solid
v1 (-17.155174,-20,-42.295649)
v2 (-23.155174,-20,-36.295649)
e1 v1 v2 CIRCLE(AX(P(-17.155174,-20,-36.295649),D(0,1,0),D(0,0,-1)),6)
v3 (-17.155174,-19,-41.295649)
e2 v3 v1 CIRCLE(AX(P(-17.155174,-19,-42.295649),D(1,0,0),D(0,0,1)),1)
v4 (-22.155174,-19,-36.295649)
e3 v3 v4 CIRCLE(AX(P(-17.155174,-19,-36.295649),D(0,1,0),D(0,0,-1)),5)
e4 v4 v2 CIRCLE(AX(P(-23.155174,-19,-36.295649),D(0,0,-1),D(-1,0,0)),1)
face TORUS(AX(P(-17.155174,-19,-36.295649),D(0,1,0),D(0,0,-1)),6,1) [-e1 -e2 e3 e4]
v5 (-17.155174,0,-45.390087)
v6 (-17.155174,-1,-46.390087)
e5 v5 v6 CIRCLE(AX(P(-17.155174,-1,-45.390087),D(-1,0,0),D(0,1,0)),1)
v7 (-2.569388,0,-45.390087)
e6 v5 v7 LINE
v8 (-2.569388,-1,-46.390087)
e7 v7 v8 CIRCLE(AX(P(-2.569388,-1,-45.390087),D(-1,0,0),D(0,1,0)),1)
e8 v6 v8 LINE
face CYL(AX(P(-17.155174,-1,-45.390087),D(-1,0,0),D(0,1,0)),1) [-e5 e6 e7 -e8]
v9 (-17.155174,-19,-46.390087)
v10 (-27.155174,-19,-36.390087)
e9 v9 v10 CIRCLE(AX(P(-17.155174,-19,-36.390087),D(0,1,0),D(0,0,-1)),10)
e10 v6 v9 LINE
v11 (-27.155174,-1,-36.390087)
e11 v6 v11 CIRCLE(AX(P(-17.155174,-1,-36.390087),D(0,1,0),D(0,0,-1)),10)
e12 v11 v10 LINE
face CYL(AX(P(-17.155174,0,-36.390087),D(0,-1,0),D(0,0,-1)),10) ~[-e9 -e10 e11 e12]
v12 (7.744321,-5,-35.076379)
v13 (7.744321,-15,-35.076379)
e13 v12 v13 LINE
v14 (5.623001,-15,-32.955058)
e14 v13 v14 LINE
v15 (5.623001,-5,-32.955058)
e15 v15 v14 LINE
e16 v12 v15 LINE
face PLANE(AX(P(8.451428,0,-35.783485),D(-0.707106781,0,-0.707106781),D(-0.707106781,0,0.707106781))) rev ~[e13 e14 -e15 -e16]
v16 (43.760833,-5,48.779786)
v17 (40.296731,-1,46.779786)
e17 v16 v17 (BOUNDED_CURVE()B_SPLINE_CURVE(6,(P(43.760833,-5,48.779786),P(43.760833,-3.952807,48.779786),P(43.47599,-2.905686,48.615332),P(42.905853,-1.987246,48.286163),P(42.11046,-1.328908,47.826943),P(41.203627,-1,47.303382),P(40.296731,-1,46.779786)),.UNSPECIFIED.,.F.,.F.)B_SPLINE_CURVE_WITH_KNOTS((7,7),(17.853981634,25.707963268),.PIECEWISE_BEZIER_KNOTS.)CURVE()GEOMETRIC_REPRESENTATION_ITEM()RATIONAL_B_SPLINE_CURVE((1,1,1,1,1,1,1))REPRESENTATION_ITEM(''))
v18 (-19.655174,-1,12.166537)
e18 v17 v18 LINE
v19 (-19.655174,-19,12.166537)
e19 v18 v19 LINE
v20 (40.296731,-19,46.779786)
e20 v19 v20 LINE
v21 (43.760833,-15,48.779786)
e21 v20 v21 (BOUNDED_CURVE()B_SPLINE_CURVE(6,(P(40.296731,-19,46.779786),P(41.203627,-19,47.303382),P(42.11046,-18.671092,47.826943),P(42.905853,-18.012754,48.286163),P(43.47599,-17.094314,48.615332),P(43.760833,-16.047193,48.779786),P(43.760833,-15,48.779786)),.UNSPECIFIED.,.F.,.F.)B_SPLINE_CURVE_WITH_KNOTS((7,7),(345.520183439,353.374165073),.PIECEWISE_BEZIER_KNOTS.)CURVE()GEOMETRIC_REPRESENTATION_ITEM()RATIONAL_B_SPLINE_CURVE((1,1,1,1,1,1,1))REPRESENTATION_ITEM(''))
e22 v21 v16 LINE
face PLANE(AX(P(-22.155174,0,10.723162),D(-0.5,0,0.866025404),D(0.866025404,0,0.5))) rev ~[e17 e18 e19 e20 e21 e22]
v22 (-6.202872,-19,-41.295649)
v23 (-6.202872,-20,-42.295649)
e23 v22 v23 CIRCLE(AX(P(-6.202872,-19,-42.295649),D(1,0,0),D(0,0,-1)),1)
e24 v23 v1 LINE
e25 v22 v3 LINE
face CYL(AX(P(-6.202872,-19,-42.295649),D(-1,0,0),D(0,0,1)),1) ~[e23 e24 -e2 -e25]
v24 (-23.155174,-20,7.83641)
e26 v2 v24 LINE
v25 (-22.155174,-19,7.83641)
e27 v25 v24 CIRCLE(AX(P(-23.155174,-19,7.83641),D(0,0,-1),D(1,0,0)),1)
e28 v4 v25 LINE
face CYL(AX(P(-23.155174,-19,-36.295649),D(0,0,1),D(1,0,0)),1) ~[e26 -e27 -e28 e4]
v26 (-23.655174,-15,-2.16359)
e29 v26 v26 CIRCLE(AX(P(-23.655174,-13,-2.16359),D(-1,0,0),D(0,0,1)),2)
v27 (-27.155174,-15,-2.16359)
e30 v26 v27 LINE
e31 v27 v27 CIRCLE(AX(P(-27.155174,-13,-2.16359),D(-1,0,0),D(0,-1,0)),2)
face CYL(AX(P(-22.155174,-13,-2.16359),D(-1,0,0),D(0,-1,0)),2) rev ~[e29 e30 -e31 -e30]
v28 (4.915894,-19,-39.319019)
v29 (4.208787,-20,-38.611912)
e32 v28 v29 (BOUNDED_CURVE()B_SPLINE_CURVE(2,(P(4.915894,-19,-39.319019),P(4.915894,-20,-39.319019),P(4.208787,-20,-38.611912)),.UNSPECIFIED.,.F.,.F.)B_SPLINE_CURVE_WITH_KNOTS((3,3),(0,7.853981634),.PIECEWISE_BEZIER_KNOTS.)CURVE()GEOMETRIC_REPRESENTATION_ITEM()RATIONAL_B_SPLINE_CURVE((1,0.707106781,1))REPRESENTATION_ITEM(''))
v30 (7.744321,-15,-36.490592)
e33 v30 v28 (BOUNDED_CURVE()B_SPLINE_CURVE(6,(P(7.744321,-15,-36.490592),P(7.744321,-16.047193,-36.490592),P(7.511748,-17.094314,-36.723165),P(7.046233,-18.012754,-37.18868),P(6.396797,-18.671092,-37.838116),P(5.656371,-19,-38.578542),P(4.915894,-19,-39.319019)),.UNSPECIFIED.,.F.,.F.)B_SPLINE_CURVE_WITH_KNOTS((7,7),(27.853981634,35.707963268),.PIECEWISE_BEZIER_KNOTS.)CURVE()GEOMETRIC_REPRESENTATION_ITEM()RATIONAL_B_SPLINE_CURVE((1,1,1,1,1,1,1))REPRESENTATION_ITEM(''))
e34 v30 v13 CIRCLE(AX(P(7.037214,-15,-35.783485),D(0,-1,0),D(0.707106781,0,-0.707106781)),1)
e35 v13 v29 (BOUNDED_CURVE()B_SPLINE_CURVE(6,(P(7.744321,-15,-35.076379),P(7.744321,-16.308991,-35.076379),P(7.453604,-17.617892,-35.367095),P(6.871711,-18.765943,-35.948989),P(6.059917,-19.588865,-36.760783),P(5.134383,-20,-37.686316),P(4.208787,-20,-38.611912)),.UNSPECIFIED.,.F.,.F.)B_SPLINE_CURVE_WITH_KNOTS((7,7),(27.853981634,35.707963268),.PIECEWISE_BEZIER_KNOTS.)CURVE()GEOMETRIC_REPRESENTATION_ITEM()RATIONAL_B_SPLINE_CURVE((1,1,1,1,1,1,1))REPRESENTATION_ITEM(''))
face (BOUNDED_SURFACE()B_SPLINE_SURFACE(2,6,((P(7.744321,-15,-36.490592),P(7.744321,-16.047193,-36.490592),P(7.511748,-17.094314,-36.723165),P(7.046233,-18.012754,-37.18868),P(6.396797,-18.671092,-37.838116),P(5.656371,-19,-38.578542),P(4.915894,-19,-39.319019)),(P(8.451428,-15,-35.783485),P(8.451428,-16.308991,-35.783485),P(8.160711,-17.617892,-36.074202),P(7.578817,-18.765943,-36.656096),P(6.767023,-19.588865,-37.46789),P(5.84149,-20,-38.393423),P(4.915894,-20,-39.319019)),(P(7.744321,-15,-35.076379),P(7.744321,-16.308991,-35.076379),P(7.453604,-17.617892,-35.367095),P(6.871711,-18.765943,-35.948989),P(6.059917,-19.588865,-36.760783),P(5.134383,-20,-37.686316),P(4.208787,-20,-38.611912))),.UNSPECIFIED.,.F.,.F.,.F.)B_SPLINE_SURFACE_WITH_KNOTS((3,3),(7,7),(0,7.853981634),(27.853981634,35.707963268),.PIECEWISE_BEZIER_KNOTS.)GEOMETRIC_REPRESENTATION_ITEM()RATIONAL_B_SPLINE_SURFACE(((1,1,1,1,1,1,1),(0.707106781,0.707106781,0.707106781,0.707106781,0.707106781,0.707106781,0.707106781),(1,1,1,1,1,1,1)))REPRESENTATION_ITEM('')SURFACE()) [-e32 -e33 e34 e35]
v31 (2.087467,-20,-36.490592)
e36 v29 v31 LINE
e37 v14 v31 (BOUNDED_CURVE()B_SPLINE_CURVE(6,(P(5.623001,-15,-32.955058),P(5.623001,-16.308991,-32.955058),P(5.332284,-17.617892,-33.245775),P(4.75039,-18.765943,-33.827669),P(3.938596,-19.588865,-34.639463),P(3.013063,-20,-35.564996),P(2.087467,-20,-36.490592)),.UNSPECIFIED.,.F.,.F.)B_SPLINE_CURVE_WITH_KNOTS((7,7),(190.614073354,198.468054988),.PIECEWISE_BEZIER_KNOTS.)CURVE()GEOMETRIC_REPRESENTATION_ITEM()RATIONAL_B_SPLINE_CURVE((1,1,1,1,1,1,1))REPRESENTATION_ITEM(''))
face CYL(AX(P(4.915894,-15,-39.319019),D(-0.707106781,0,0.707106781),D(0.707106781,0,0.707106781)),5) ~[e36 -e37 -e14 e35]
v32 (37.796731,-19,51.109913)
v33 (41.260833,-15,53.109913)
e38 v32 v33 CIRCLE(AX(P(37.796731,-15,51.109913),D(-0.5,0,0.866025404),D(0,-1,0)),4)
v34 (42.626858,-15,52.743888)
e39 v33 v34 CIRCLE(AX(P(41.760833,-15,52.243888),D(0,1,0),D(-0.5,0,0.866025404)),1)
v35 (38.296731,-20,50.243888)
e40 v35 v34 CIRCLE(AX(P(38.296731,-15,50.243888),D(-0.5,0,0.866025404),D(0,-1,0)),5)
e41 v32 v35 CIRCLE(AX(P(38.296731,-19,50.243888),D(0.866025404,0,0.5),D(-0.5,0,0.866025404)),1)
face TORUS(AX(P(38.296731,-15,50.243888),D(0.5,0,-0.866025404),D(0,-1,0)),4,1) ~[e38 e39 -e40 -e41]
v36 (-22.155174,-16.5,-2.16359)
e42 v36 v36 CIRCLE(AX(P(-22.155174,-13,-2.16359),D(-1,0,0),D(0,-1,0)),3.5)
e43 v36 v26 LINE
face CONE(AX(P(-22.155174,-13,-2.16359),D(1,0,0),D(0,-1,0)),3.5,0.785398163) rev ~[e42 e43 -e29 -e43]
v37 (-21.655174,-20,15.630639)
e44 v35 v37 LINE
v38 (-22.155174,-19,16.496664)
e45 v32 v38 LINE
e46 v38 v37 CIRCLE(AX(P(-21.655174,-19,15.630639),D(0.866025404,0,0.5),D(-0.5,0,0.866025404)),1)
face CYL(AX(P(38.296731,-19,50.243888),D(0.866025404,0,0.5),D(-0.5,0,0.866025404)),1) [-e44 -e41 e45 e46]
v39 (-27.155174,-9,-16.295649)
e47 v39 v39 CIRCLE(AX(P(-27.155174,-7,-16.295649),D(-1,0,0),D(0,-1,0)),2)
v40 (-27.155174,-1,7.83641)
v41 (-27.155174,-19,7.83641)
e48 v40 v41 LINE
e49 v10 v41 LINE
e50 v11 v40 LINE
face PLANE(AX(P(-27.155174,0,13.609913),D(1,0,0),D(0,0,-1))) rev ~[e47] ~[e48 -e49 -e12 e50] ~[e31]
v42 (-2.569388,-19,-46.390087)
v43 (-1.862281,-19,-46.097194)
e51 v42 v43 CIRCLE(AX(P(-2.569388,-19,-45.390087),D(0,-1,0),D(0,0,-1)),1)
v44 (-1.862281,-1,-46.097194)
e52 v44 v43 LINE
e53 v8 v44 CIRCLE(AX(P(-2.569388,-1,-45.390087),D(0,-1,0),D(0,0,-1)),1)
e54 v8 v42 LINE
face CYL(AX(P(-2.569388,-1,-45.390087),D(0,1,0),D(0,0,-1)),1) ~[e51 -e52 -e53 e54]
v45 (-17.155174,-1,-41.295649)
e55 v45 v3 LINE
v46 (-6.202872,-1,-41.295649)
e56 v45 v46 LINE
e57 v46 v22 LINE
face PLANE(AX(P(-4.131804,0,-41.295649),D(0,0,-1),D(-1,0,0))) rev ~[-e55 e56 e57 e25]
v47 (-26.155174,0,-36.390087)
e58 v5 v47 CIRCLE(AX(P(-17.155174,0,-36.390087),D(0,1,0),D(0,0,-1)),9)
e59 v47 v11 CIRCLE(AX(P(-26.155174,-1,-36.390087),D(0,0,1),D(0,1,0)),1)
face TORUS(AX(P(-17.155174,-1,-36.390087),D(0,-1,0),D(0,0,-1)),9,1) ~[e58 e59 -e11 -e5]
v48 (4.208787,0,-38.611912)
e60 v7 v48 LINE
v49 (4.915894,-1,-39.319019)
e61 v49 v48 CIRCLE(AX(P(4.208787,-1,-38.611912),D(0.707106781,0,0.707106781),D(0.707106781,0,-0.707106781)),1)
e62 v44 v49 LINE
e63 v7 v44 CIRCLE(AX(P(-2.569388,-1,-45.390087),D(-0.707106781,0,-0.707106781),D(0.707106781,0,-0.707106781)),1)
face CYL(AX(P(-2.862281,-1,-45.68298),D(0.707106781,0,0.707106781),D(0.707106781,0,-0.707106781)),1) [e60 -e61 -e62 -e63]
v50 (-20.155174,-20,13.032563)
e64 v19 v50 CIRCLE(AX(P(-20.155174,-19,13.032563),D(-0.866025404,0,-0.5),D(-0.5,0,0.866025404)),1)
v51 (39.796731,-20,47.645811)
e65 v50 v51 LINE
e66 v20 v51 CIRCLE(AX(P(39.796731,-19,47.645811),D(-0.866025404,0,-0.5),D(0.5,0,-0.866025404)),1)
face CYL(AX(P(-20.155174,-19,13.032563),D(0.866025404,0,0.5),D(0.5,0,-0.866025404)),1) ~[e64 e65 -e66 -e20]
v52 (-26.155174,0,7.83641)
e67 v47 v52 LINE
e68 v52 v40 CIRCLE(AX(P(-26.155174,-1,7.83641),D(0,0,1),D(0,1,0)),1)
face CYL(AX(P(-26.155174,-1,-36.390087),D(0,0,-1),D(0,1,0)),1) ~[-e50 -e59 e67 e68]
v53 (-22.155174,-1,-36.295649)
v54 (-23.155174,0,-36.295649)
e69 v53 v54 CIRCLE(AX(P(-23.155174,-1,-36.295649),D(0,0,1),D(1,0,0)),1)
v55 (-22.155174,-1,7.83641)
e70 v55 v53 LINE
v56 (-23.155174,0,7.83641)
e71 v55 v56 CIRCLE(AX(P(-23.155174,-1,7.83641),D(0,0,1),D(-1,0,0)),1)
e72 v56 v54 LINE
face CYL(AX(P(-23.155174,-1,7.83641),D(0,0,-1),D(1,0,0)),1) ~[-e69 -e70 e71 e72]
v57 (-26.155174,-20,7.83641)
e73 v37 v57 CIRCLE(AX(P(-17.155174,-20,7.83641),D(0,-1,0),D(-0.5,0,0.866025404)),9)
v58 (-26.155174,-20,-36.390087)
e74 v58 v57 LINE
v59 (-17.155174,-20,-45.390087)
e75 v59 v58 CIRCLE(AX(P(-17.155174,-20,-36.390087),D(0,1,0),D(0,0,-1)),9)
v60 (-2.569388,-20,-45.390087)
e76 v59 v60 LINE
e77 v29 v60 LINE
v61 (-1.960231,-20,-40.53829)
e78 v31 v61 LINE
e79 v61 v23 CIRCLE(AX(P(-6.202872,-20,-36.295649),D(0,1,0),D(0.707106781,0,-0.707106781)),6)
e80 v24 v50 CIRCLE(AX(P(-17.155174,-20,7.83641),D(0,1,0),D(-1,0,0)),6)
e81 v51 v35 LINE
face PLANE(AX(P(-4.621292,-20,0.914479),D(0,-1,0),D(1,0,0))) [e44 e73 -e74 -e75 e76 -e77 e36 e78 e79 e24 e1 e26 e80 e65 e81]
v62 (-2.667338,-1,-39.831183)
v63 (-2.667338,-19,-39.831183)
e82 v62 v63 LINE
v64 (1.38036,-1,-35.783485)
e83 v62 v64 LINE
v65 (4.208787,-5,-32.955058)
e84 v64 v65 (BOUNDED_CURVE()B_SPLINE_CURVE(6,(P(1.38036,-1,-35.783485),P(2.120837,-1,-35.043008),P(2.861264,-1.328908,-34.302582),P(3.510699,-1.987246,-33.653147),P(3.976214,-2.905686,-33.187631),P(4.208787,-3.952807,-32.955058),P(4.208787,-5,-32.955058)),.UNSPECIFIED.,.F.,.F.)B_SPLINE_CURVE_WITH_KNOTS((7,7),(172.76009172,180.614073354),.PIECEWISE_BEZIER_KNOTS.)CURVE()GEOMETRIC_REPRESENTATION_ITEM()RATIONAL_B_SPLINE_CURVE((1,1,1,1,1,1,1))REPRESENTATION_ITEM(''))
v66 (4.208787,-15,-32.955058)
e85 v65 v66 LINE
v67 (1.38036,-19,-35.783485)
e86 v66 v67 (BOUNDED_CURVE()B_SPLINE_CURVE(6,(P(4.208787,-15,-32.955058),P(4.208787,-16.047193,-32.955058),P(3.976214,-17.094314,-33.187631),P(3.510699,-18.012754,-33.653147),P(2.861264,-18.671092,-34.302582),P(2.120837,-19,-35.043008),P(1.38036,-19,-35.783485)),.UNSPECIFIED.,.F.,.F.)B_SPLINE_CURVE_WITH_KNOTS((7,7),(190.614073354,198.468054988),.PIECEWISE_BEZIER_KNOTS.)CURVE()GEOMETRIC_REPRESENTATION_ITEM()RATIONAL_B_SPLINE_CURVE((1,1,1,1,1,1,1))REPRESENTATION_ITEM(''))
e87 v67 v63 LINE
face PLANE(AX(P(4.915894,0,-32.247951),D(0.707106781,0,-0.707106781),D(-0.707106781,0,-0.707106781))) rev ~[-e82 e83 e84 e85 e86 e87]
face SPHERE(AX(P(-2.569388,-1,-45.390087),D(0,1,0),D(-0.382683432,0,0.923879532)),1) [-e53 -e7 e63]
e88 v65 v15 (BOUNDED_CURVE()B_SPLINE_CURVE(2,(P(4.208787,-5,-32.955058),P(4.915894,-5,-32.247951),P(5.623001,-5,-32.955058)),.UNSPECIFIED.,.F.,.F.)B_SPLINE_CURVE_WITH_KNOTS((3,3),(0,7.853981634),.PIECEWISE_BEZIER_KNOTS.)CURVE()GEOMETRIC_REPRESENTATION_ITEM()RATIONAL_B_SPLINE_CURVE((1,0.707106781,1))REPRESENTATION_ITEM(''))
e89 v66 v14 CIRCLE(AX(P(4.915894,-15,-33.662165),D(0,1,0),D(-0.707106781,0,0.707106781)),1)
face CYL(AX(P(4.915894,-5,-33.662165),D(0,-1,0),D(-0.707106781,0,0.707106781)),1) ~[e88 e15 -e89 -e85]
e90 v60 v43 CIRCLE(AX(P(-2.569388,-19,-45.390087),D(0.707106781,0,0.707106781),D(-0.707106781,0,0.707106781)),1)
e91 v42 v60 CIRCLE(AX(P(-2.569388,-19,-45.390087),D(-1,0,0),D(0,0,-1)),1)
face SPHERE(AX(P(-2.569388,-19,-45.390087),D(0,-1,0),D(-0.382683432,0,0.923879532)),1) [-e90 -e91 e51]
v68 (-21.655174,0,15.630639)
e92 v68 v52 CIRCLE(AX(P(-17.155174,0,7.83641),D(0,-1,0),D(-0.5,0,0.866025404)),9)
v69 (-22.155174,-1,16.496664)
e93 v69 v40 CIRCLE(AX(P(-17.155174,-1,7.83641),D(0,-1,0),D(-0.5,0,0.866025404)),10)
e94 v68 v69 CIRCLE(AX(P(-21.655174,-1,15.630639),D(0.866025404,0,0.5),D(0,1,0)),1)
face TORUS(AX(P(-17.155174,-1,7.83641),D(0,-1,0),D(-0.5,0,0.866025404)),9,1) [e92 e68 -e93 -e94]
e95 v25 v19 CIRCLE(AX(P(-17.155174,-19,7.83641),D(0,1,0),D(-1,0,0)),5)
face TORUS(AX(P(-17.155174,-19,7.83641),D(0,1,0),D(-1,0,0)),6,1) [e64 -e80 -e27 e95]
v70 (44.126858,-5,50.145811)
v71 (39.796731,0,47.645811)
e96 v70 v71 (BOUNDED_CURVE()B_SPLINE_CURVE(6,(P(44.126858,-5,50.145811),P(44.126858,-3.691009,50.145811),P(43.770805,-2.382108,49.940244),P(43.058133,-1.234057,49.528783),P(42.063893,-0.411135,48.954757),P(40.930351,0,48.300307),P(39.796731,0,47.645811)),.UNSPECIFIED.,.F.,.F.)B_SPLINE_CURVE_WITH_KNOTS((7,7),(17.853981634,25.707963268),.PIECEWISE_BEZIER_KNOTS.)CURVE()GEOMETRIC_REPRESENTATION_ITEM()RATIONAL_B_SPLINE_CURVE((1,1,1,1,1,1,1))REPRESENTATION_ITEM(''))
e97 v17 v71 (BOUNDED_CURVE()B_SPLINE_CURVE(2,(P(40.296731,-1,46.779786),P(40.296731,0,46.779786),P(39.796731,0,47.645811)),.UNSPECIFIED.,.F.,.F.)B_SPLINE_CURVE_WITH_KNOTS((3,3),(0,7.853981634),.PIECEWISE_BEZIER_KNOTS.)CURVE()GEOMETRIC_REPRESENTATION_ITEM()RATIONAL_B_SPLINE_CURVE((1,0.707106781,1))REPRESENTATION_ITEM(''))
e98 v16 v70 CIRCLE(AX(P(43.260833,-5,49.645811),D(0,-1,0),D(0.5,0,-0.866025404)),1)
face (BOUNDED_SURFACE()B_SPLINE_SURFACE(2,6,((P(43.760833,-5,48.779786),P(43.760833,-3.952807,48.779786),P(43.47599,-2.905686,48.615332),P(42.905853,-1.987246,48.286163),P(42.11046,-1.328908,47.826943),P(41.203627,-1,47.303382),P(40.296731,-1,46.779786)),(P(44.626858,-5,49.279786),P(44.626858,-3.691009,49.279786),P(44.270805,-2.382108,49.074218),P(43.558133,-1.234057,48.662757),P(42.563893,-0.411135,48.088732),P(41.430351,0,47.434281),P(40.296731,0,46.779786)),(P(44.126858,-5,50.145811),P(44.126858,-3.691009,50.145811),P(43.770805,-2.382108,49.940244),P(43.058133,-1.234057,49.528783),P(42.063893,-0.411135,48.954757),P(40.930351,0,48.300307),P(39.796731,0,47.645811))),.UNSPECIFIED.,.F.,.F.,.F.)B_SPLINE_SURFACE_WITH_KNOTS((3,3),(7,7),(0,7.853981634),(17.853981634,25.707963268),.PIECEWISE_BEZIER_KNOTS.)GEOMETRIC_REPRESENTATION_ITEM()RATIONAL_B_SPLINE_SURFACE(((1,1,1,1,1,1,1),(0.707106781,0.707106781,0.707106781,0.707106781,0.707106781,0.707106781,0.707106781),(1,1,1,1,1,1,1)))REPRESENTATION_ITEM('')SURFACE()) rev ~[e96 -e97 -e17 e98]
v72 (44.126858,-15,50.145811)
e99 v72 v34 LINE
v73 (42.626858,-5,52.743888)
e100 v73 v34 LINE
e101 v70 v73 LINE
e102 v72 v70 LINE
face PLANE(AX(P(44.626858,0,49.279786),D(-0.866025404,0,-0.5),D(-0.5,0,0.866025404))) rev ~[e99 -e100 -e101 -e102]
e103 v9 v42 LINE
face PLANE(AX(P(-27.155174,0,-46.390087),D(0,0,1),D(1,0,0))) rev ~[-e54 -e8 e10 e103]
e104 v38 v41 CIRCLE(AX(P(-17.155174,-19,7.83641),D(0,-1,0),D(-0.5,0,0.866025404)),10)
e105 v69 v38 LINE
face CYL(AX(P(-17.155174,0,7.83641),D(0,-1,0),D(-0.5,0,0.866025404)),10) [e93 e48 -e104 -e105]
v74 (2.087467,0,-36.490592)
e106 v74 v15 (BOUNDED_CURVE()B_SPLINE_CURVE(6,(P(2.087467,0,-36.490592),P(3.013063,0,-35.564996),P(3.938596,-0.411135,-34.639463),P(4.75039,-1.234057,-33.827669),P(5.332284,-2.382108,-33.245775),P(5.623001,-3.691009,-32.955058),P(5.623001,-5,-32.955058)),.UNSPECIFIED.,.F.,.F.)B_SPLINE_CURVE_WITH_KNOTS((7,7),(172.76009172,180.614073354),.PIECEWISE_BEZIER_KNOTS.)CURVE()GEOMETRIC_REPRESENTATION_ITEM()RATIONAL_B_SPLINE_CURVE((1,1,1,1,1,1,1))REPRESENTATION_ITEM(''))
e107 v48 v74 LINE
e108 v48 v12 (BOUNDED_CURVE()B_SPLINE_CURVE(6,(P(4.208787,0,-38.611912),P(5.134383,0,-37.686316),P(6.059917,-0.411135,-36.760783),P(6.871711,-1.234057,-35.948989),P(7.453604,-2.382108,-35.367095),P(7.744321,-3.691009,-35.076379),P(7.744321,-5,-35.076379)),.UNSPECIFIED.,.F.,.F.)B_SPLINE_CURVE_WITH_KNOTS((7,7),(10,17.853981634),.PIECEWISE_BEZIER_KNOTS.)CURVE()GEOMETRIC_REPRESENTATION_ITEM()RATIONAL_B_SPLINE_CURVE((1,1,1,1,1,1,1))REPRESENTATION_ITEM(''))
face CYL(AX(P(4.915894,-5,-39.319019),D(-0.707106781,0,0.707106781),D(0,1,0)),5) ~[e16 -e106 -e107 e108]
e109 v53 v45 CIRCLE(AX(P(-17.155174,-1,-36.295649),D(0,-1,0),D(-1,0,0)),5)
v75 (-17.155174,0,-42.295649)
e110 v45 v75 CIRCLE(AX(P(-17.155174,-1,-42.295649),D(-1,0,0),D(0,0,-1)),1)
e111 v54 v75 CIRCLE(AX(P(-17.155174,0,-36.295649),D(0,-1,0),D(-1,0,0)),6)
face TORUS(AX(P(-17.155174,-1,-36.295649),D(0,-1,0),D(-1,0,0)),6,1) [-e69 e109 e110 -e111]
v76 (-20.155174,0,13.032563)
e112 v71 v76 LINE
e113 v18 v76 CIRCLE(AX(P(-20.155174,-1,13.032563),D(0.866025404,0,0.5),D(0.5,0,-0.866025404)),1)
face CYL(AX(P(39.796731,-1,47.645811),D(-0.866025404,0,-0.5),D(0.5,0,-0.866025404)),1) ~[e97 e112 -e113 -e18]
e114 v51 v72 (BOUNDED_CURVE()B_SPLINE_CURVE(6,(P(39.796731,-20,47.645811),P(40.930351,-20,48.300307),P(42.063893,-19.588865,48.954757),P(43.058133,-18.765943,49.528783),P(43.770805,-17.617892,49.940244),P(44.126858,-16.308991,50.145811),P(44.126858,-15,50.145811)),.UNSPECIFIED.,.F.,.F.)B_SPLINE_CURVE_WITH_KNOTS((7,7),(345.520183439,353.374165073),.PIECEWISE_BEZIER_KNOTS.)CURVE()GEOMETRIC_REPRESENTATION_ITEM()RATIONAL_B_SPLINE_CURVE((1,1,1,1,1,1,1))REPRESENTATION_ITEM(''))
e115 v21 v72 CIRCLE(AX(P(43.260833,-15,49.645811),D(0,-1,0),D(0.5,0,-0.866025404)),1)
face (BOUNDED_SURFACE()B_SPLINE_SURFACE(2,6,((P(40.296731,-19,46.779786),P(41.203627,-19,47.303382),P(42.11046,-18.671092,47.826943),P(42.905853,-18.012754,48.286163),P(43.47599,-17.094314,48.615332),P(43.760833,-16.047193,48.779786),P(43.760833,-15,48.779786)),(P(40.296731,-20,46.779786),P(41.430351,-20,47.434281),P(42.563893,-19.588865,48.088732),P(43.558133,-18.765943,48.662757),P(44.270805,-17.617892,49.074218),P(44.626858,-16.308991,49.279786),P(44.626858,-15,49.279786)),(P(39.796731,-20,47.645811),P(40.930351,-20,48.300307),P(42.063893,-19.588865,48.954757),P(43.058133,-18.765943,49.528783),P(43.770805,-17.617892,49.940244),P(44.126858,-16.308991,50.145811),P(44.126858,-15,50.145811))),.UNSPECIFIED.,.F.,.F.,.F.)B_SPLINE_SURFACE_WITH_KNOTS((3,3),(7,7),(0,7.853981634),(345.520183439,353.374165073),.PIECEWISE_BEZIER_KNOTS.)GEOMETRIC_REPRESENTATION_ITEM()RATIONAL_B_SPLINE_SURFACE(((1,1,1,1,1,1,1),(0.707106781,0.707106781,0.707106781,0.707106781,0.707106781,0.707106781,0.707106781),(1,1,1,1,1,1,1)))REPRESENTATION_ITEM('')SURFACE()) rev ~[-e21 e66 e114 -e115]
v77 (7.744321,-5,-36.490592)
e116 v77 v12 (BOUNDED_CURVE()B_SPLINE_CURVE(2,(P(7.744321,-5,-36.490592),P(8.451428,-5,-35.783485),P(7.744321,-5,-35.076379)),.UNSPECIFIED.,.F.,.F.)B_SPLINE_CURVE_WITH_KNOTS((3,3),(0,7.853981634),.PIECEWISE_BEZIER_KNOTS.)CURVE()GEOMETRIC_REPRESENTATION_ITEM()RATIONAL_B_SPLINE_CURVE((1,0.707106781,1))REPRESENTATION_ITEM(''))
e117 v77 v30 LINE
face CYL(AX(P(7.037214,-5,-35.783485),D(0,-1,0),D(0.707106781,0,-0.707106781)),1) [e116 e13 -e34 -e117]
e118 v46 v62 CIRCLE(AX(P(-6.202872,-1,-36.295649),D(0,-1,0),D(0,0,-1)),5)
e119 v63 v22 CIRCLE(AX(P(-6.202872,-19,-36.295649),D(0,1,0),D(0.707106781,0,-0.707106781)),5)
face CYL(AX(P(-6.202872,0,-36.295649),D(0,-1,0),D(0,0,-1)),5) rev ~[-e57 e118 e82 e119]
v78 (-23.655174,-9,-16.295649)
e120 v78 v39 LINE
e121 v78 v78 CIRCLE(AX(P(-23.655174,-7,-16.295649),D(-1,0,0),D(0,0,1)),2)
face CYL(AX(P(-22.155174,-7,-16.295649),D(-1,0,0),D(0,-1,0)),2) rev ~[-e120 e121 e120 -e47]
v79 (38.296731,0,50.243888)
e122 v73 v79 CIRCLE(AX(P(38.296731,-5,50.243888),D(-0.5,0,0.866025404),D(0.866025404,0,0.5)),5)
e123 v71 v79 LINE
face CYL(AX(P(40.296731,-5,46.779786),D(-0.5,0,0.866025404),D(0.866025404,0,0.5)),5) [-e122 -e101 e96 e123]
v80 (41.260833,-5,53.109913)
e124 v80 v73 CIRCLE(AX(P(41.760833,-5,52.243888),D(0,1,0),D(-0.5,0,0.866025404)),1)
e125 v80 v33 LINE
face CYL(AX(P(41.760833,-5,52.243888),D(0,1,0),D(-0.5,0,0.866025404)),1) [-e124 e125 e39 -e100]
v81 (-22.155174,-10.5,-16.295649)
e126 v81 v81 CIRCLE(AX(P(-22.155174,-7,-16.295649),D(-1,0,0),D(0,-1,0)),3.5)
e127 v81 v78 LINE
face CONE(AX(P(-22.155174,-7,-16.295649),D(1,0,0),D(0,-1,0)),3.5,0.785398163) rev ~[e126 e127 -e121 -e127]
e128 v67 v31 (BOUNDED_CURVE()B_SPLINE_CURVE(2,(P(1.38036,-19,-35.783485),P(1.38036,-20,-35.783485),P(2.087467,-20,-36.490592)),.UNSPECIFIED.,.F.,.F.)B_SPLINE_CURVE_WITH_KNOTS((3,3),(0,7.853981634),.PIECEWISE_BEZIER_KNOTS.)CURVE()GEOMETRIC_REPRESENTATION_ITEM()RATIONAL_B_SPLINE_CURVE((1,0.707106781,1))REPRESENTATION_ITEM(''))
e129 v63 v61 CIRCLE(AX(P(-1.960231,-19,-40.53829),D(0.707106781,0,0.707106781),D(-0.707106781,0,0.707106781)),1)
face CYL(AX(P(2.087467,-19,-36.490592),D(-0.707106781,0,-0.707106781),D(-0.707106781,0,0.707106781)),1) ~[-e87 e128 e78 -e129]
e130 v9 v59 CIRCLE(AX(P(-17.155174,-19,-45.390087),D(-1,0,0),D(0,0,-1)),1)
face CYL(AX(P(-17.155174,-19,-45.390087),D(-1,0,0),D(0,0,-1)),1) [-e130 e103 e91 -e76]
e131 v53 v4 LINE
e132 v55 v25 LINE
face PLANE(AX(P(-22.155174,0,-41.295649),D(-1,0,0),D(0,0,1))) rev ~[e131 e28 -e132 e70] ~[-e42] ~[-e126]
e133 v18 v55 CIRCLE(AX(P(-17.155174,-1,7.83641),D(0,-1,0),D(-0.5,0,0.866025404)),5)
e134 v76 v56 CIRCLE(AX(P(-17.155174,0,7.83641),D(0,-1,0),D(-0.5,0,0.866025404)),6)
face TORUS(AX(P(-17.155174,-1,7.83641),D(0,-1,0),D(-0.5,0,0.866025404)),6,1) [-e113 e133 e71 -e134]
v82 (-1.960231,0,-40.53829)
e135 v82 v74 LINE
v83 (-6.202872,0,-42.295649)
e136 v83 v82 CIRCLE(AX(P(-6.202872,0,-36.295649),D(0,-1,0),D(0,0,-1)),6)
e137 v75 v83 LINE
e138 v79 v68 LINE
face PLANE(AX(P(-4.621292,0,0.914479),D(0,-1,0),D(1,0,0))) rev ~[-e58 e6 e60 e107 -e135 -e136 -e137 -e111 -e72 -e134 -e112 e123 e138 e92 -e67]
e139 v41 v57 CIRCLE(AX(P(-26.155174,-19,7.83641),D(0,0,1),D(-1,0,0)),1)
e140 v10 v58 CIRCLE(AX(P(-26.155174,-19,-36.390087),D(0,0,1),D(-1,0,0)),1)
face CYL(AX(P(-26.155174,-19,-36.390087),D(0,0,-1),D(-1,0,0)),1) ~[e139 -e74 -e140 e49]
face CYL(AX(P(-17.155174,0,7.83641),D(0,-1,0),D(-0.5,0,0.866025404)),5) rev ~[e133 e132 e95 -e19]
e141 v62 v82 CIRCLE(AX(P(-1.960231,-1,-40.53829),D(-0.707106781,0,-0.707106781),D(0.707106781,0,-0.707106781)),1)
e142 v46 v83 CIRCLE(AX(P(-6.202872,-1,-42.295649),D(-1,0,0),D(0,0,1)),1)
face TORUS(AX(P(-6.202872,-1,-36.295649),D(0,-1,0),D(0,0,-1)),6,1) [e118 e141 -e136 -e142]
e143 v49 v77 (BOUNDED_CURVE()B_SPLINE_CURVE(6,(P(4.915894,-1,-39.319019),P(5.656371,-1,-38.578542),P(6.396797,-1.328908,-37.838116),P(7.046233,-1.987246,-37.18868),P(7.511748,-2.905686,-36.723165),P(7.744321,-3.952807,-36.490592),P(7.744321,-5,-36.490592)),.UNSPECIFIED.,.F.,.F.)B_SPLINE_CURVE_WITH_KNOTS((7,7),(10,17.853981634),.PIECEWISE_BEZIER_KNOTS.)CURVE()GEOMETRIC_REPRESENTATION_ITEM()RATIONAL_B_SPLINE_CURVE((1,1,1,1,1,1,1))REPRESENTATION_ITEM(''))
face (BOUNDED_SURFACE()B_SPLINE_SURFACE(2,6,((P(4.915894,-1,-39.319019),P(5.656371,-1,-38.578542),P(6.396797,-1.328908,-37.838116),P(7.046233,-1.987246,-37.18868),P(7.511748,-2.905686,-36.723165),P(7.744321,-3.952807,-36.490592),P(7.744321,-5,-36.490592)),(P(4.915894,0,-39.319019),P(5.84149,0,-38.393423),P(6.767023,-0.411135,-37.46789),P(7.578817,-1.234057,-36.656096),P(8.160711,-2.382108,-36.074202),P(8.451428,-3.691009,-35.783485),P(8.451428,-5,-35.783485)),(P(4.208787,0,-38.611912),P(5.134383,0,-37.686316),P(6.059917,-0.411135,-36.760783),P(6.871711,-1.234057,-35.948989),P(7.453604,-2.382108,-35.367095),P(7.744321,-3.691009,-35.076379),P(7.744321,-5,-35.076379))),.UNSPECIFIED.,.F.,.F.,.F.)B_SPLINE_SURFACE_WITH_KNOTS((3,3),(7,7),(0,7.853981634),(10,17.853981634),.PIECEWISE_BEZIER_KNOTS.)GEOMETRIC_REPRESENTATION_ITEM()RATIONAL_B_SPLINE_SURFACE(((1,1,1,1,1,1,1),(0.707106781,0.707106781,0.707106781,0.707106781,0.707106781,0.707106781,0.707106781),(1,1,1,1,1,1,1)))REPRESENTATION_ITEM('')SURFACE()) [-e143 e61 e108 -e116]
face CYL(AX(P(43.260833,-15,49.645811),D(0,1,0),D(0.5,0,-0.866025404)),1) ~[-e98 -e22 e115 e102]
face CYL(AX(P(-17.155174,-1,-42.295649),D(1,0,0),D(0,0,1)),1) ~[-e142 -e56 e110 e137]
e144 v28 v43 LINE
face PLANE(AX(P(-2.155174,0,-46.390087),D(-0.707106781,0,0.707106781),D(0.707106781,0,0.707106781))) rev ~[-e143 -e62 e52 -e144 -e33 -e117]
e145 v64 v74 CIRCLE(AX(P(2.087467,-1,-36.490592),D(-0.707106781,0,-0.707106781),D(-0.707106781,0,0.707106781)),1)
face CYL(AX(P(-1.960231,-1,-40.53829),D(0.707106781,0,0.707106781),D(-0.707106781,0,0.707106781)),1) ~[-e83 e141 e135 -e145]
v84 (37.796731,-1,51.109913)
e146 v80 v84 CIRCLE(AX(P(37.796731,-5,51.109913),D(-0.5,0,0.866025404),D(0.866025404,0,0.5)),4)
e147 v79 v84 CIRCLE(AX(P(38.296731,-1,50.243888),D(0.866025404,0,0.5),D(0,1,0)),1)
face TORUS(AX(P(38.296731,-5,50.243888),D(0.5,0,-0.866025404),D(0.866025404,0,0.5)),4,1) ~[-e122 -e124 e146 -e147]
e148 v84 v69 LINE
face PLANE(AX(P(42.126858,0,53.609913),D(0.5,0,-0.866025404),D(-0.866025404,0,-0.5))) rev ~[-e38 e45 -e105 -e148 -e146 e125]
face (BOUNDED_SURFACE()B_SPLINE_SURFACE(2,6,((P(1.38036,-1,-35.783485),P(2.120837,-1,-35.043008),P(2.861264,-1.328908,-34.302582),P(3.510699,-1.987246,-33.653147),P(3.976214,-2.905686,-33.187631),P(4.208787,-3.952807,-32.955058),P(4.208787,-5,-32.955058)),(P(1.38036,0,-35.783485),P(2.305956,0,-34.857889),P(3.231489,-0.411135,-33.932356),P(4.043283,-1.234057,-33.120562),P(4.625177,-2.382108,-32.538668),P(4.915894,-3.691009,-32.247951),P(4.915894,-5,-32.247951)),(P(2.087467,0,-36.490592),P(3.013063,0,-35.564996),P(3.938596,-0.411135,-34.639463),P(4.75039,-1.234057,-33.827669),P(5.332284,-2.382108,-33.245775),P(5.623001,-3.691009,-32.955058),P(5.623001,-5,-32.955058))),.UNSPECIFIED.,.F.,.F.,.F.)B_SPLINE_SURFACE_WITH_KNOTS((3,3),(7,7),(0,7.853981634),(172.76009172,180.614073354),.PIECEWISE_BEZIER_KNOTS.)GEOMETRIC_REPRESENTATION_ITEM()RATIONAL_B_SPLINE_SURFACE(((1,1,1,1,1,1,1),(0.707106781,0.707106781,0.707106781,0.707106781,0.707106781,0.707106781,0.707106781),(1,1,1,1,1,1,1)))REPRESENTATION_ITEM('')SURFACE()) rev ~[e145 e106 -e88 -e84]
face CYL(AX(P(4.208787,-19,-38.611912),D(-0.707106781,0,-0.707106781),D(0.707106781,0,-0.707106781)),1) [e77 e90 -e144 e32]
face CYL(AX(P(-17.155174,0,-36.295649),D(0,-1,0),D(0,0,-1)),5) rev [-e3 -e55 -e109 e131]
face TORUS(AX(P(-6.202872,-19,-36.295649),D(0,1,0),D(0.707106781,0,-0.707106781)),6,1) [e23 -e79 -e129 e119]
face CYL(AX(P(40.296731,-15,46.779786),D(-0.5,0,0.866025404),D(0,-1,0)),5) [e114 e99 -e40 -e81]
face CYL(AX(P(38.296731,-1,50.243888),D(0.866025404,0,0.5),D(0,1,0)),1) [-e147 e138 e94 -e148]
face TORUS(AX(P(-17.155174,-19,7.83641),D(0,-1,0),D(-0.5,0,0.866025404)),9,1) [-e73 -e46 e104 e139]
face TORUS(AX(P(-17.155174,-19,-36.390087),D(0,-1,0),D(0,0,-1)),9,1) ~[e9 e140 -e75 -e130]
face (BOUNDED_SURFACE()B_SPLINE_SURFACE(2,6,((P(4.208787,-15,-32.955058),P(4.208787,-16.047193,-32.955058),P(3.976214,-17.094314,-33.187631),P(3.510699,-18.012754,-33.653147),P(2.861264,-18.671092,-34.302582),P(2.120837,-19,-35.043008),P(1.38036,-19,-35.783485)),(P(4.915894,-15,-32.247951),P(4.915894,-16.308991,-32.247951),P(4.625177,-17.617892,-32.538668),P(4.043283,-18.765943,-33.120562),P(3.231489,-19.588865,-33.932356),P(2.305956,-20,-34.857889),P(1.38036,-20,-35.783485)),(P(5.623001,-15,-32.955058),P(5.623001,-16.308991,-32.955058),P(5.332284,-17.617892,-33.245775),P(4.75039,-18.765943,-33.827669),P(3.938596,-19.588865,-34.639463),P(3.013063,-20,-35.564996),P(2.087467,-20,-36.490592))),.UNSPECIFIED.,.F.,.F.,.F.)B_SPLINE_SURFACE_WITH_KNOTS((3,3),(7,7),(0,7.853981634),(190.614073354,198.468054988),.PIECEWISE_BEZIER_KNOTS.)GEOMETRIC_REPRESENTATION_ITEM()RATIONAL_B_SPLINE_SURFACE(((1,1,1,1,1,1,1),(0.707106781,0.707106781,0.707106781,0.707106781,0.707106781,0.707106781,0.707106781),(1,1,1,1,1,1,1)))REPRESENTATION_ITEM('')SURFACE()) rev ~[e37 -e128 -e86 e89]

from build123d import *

# Parameters (mm, degrees)
F1_DEPTH        = 20
F2_R            = 5
F3_R            = 5
F4_R            = 10
F5_R            = 5
F6_R            = 5
F7_R            = 5
F8_R            = 5
F9_R            = 5
F10_R           = 1
F11_R           = 1
F12_T1_DEPTH    = 14.5857864376
F12_T3_DEPTH    = 44.2264973081
F12_T5_DEPTH    = 69.2264973081
F12_T7_DEPTH    = 18
F12_T9_DEPTH    = 10
F12_T14_DEPTH   = 1
F12_T20_DEPTH   = 1
F12_T24_ANGLE   = 90
F12_T26_ANGLE   = 90
F12_T28_ANGLE   = 60
F12_T30_ANGLE   = 60
F12_T32_ANGLE   = 90
F12_T34_ANGLE   = 90
F14_D           = 4
F14_CSINK_D     = 7
F14_CSINK_ANGLE = 90
F15_D           = 4
F15_CSINK_D     = 7
F15_CSINK_ANGLE = 90


# Not quite as in the source:
# - a fillet or chamfer that OpenCascade refuses, or shapes differently, is made with other operations: its cross-section is extruded or revolved along the edge and cut away or added


with BuildPart() as f1:
    # F0 (on Front) → F1 (new body)
    with BuildSketch(Plane.XZ):
        Polygon((42.1268583603, 53.609912917), (-27.1551739424, 13.609912917), (-27.1551739424, -46.390087083), (-2.1551739424, -46.390087083), (8.4514277754, -35.7834853652), (4.9158938694, -32.2479514593), (-4.1318040205, -41.2956493492), (-22.1551739424, -41.2956493492), (-22.1551739424, 10.7231615711), (44.6268583603, 49.2797858981), align=None)
    extrude(amount=F1_DEPTH)

    # F2
    f2_edges = [f1.edges().sort_by_distance(p)[0] for p in [
        (-22.155174, -10, -41.295649),
    ]]
    fillet(f2_edges, radius=F2_R)

    # F3
    f3_edges = [f1.edges().sort_by_distance(p)[0] for p in [
        (-4.131804, -10, -41.295649),
    ]]
    fillet(f3_edges, radius=F3_R)

    # F4
    f4_edges = [f1.edges().sort_by_distance(p)[0] for p in [
        (-27.155174, -10, -46.390087),
        (-27.155174, -10, 13.609913),
    ]]
    fillet(f4_edges, radius=F4_R)

    # F5
    f5_edges = [f1.edges().sort_by_distance(p)[0] for p in [
        (-22.155174, -10, 10.723162),
    ]]
    fillet(f5_edges, radius=F5_R)

    # F6
    f6_edges = [f1.edges().sort_by_distance(p)[0] for p in [
        (6.683661, 0, -34.015718),
    ]]
    fillet(f6_edges, radius=F6_R)

    # F7
    f7_edges = [f1.edges().sort_by_distance(p)[0] for p in [
        (6.683661, -20, -34.015718),
    ]]
    fillet(f7_edges, radius=F7_R)

    # F8
    f8_edges = [f1.edges().sort_by_distance(p)[0] for p in [
        (43.376858, -20, 51.444849),
    ]]
    fillet(f8_edges, radius=F8_R)

    # F9
    f9_edges = [f1.edges().sort_by_distance(p)[0] for p in [
        (43.376858, 0, 51.444849),
    ]]
    fillet(f9_edges, radius=F9_R)

    # F10
    f10_edges = [f1.edges().sort_by_distance(p)[0] for p in [
        (43.358594, -18.535534, 48.547553),
    ]]
    fillet(f10_edges, radius=F10_R)

    # F11
    f11_edges = [f1.edges().sort_by_distance(p)[0] for p in [
        (7.415894, -18.535534, -36.819019),
    ]]
    fillet(f11_edges, radius=F11_R)

    # F12: fillet of radius 1 on 14 edges, made by hand

    # F12_s2 → F12_t1 (cut)
    with BuildSketch(Plane.YZ.offset(-17.1551739424)):
        with BuildLine():
            ThreePointArc((0, -45.390087083), (-0.2928932188, -46.0971938642), (-1, -46.390087083))
            Line((-1, -46.390087083), (0, -46.390087083))
            Line((0, -46.390087083), (0, -45.390087083))
        make_face()
        with BuildLine():
            ThreePointArc((-19, -46.390087083), (-19.7071067812, -46.0971938642), (-20, -45.390087083))
            Line((-20, -45.390087083), (-20, -46.390087083))
            Line((-20, -46.390087083), (-19, -46.390087083))
        make_face()
    extrude(amount=F12_T1_DEPTH, mode=Mode.SUBTRACT)

    # F12_s4 → F12_t3 (cut)
    with BuildSketch(Plane.XY.offset(-36.390087083)):
        with BuildLine():
            ThreePointArc((-26.1551739424, 0), (-26.8622807236, -0.2928932188), (-27.1551739424, -1))
            Line((-27.1551739424, -1), (-27.1551739424, 0))
            Line((-27.1551739424, 0), (-26.1551739424, 0))
        make_face()
        with BuildLine():
            ThreePointArc((-27.1551739424, -19), (-26.8622807236, -19.7071067812), (-26.1551739424, -20))
            Line((-26.1551739424, -20), (-27.1551739424, -20))
            Line((-27.1551739424, -20), (-27.1551739424, -19))
        make_face()
    extrude(amount=F12_T3_DEPTH, mode=Mode.SUBTRACT)

    # F12_s6 → F12_t5 (cut)
    with BuildSketch(Plane(origin=(50.4787899917, 0, 29.1439429901), x_dir=(0, 1, 0), z_dir=(-0.8660254038, 0, -0.5))):
        with BuildLine():
            ThreePointArc((0, -24.3641173007), (-0.2928932188, -25.0712240818), (-1, -25.3641173007))
            Line((-1, -25.3641173007), (0, -25.3641173007))
            Line((0, -25.3641173007), (0, -24.3641173007))
        make_face()
        with BuildLine():
            ThreePointArc((-19, -25.3641173007), (-19.7071067812, -25.0712240818), (-20, -24.3641173007))
            Line((-20, -24.3641173007), (-20, -25.3641173007))
            Line((-20, -25.3641173007), (-19, -25.3641173007))
        make_face()
    extrude(amount=F12_T5_DEPTH, mode=Mode.SUBTRACT)

    # F12_s8 → F12_t7 (cut)
    with BuildSketch(Plane.XZ.offset(1)):
        with BuildLine():
            ThreePointArc((-2.5693875048, -46.390087083), (-2.1867040725, -46.3139666155), (-1.8622807236, -46.0971938642))
            Line((-1.8622807236, -46.0971938642), (-2.1551739424, -46.390087083))
            Line((-2.1551739424, -46.390087083), (-2.5693875048, -46.390087083))
        make_face()
    extrude(amount=F12_T7_DEPTH, mode=Mode.SUBTRACT)

    # F12_s10 → F12_t9 (cut)
    with BuildSketch(Plane.XZ.offset(5)):
        with BuildLine():
            ThreePointArc((41.2608329565, 53.109912917), (42.0196520016, 53.2098133395), (42.6268583603, 52.7438875132))
            Line((42.6268583603, 52.7438875132), (42.1268583603, 53.609912917))
            Line((42.1268583603, 53.609912917), (41.2608329565, 53.109912917))
        make_face()
    extrude(amount=F12_T9_DEPTH, mode=Mode.SUBTRACT)


with BuildPart() as f12_tool12:
    # F12_s13 → F12_t14 (new body)
    with BuildSketch(Plane.XZ.offset(19)):
        Polygon((-2.5693875048, -45.390087083), (-1.8622807236, -46.0971938642), (-2.1551739424, -46.390087083), (-2.5693875048, -46.390087083), align=None)
    extrude(amount=F12_T14_DEPTH)

    # F12_s15 → F12_t16 (revolve, cut)
    with BuildSketch(Plane(origin=(-2.5693875048, -19, -45.390087083), x_dir=(-0.3826834324, 0, 0.9238795325), z_dir=(0.9238795325, 0, 0.3826834324))):
        with BuildLine():
            ThreePointArc((0, -1), (1, 0), (0, 1))
            Line((0, 1), (0, -1))
        make_face()
    revolve(axis=Axis((-2.5693875048, -19, -45.390087083), (0, -1, 0)), mode=Mode.SUBTRACT)


with BuildPart() as f1_1:
    add(f1.part)

    # F12_t11: cut F12_tool12
    add(f12_tool12.part, mode=Mode.SUBTRACT)


with BuildPart() as f12_tool18:
    # F12_s19 → F12_t20 (new body)
    with BuildSketch(Plane.XZ.offset(1)):
        Polygon((-2.5693875048, -45.390087083), (-1.8622807236, -46.0971938642), (-2.1551739424, -46.390087083), (-2.5693875048, -46.390087083), align=None)
    extrude(amount=-F12_T20_DEPTH)

    # F12_s21 → F12_t22 (revolve, cut)
    with BuildSketch(Plane(origin=(-2.5693875048, -1, -45.390087083), x_dir=(-0.3826834324, 0, 0.9238795325), z_dir=(-0.9238795325, 0, -0.3826834324))):
        with BuildLine():
            ThreePointArc((0, -1), (1, 0), (0, 1))
            Line((0, 1), (0, -1))
        make_face()
    revolve(axis=Axis((-2.5693875048, -1, -45.390087083), (0, 1, 0)), mode=Mode.SUBTRACT)


with BuildPart() as f1_2:
    add(f1_1.part)

    # F12_t17: cut F12_tool18
    add(f12_tool18.part, mode=Mode.SUBTRACT)

    # F12_s23 → F12_t24 (revolve, cut)
    with BuildSketch(Plane.YZ.offset(-17.1551739424)):
        with BuildLine():
            ThreePointArc((-19, -46.390087083), (-19.7071067812, -46.0971938642), (-20, -45.390087083))
            Line((-20, -45.390087083), (-20, -46.390087083))
            Line((-20, -46.390087083), (-19, -46.390087083))
        make_face()
    revolve(axis=Axis((-17.1551739424, -20, -36.390087083), (0, 1, 0)), revolution_arc=F12_T24_ANGLE, mode=Mode.SUBTRACT)

    # F12_s25 → F12_t26 (revolve, cut)
    with BuildSketch(Plane.YZ.offset(-17.1551739424)):
        with BuildLine():
            ThreePointArc((0, -45.390087083), (-0.2928932188, -46.0971938642), (-1, -46.390087083))
            Line((-1, -46.390087083), (0, -46.390087083))
            Line((0, -46.390087083), (0, -45.390087083))
        make_face()
    revolve(axis=Axis((-17.1551739424, 0, -36.390087083), (0, 1, 0)), revolution_arc=F12_T26_ANGLE, mode=Mode.SUBTRACT)

    # F12_s27 → F12_t28 (revolve, cut)
    with BuildSketch(Plane(origin=(-9.4731152921, 0, -5.469305664), x_dir=(0, 1, 0), z_dir=(0.8660254038, 0, 0.5))):
        with BuildLine():
            ThreePointArc((0, 24.3641173007), (-0.2928932188, 25.0712240818), (-1, 25.3641173007))
            Line((-1, 25.3641173007), (0, 25.3641173007))
            Line((0, 25.3641173007), (0, 24.3641173007))
        make_face()
    revolve(axis=Axis((-17.1551739424, 0, 7.8364102251), (0, -1, 0)), revolution_arc=F12_T28_ANGLE, mode=Mode.SUBTRACT)

    # F12_s29 → F12_t30 (revolve, cut)
    with BuildSketch(Plane(origin=(-9.4731152921, 0, -5.469305664), x_dir=(0, 1, 0), z_dir=(0.8660254038, 0, 0.5))):
        with BuildLine():
            ThreePointArc((-19, 25.3641173007), (-19.7071067812, 25.0712240818), (-20, 24.3641173007))
            Line((-20, 24.3641173007), (-20, 25.3641173007))
            Line((-20, 25.3641173007), (-19, 25.3641173007))
        make_face()
    revolve(axis=Axis((-17.1551739424, -20, 7.8364102251), (0, -1, 0)), revolution_arc=F12_T30_ANGLE, mode=Mode.SUBTRACT)

    # F12_s31 → F12_t32 (revolve, cut)
    with BuildSketch(Plane.XZ.offset(5)):
        with BuildLine():
            ThreePointArc((41.2608329565, 53.109912917), (42.0196520016, 53.2098133395), (42.6268583603, 52.7438875132))
            Line((42.6268583603, 52.7438875132), (42.1268583603, 53.609912917))
            Line((42.1268583603, 53.609912917), (41.2608329565, 53.109912917))
        make_face()
    revolve(axis=Axis((37.7967313414, -5, 51.109912917), (-0.5, 0, 0.8660254038)), revolution_arc=F12_T32_ANGLE, mode=Mode.SUBTRACT)

    # F12_s33 → F12_t34 (revolve, cut)
    with BuildSketch(Plane(origin=(50.4787899917, 0, 29.1439429901), x_dir=(0, 1, 0), z_dir=(-0.8660254038, 0, -0.5))):
        with BuildLine():
            ThreePointArc((-19, -25.3641173007), (-19.7071067812, -25.0712240818), (-20, -24.3641173007))
            Line((-20, -24.3641173007), (-20, -25.3641173007))
            Line((-20, -25.3641173007), (-19, -25.3641173007))
        make_face()
    revolve(axis=Axis((37.7967313414, -15, 51.109912917), (-0.5, 0, 0.8660254038)), revolution_arc=F12_T34_ANGLE, mode=Mode.SUBTRACT)

    # F14 (through all)
    with Locations(Plane.YZ.offset(-22.1551739424)):
        with Locations((-13, -2.1635897749)):
            CounterSinkHole(F14_D / 2, F14_CSINK_D / 2, counter_sink_angle=F14_CSINK_ANGLE)

    # F15 (through all)
    with Locations(Plane.YZ.offset(-22.1551739424)):
        with Locations((-7, -16.2956493492)):
            CounterSinkHole(F15_D / 2, F15_CSINK_D / 2, counter_sink_angle=F15_CSINK_ANGLE)


solid = f1_2.part
